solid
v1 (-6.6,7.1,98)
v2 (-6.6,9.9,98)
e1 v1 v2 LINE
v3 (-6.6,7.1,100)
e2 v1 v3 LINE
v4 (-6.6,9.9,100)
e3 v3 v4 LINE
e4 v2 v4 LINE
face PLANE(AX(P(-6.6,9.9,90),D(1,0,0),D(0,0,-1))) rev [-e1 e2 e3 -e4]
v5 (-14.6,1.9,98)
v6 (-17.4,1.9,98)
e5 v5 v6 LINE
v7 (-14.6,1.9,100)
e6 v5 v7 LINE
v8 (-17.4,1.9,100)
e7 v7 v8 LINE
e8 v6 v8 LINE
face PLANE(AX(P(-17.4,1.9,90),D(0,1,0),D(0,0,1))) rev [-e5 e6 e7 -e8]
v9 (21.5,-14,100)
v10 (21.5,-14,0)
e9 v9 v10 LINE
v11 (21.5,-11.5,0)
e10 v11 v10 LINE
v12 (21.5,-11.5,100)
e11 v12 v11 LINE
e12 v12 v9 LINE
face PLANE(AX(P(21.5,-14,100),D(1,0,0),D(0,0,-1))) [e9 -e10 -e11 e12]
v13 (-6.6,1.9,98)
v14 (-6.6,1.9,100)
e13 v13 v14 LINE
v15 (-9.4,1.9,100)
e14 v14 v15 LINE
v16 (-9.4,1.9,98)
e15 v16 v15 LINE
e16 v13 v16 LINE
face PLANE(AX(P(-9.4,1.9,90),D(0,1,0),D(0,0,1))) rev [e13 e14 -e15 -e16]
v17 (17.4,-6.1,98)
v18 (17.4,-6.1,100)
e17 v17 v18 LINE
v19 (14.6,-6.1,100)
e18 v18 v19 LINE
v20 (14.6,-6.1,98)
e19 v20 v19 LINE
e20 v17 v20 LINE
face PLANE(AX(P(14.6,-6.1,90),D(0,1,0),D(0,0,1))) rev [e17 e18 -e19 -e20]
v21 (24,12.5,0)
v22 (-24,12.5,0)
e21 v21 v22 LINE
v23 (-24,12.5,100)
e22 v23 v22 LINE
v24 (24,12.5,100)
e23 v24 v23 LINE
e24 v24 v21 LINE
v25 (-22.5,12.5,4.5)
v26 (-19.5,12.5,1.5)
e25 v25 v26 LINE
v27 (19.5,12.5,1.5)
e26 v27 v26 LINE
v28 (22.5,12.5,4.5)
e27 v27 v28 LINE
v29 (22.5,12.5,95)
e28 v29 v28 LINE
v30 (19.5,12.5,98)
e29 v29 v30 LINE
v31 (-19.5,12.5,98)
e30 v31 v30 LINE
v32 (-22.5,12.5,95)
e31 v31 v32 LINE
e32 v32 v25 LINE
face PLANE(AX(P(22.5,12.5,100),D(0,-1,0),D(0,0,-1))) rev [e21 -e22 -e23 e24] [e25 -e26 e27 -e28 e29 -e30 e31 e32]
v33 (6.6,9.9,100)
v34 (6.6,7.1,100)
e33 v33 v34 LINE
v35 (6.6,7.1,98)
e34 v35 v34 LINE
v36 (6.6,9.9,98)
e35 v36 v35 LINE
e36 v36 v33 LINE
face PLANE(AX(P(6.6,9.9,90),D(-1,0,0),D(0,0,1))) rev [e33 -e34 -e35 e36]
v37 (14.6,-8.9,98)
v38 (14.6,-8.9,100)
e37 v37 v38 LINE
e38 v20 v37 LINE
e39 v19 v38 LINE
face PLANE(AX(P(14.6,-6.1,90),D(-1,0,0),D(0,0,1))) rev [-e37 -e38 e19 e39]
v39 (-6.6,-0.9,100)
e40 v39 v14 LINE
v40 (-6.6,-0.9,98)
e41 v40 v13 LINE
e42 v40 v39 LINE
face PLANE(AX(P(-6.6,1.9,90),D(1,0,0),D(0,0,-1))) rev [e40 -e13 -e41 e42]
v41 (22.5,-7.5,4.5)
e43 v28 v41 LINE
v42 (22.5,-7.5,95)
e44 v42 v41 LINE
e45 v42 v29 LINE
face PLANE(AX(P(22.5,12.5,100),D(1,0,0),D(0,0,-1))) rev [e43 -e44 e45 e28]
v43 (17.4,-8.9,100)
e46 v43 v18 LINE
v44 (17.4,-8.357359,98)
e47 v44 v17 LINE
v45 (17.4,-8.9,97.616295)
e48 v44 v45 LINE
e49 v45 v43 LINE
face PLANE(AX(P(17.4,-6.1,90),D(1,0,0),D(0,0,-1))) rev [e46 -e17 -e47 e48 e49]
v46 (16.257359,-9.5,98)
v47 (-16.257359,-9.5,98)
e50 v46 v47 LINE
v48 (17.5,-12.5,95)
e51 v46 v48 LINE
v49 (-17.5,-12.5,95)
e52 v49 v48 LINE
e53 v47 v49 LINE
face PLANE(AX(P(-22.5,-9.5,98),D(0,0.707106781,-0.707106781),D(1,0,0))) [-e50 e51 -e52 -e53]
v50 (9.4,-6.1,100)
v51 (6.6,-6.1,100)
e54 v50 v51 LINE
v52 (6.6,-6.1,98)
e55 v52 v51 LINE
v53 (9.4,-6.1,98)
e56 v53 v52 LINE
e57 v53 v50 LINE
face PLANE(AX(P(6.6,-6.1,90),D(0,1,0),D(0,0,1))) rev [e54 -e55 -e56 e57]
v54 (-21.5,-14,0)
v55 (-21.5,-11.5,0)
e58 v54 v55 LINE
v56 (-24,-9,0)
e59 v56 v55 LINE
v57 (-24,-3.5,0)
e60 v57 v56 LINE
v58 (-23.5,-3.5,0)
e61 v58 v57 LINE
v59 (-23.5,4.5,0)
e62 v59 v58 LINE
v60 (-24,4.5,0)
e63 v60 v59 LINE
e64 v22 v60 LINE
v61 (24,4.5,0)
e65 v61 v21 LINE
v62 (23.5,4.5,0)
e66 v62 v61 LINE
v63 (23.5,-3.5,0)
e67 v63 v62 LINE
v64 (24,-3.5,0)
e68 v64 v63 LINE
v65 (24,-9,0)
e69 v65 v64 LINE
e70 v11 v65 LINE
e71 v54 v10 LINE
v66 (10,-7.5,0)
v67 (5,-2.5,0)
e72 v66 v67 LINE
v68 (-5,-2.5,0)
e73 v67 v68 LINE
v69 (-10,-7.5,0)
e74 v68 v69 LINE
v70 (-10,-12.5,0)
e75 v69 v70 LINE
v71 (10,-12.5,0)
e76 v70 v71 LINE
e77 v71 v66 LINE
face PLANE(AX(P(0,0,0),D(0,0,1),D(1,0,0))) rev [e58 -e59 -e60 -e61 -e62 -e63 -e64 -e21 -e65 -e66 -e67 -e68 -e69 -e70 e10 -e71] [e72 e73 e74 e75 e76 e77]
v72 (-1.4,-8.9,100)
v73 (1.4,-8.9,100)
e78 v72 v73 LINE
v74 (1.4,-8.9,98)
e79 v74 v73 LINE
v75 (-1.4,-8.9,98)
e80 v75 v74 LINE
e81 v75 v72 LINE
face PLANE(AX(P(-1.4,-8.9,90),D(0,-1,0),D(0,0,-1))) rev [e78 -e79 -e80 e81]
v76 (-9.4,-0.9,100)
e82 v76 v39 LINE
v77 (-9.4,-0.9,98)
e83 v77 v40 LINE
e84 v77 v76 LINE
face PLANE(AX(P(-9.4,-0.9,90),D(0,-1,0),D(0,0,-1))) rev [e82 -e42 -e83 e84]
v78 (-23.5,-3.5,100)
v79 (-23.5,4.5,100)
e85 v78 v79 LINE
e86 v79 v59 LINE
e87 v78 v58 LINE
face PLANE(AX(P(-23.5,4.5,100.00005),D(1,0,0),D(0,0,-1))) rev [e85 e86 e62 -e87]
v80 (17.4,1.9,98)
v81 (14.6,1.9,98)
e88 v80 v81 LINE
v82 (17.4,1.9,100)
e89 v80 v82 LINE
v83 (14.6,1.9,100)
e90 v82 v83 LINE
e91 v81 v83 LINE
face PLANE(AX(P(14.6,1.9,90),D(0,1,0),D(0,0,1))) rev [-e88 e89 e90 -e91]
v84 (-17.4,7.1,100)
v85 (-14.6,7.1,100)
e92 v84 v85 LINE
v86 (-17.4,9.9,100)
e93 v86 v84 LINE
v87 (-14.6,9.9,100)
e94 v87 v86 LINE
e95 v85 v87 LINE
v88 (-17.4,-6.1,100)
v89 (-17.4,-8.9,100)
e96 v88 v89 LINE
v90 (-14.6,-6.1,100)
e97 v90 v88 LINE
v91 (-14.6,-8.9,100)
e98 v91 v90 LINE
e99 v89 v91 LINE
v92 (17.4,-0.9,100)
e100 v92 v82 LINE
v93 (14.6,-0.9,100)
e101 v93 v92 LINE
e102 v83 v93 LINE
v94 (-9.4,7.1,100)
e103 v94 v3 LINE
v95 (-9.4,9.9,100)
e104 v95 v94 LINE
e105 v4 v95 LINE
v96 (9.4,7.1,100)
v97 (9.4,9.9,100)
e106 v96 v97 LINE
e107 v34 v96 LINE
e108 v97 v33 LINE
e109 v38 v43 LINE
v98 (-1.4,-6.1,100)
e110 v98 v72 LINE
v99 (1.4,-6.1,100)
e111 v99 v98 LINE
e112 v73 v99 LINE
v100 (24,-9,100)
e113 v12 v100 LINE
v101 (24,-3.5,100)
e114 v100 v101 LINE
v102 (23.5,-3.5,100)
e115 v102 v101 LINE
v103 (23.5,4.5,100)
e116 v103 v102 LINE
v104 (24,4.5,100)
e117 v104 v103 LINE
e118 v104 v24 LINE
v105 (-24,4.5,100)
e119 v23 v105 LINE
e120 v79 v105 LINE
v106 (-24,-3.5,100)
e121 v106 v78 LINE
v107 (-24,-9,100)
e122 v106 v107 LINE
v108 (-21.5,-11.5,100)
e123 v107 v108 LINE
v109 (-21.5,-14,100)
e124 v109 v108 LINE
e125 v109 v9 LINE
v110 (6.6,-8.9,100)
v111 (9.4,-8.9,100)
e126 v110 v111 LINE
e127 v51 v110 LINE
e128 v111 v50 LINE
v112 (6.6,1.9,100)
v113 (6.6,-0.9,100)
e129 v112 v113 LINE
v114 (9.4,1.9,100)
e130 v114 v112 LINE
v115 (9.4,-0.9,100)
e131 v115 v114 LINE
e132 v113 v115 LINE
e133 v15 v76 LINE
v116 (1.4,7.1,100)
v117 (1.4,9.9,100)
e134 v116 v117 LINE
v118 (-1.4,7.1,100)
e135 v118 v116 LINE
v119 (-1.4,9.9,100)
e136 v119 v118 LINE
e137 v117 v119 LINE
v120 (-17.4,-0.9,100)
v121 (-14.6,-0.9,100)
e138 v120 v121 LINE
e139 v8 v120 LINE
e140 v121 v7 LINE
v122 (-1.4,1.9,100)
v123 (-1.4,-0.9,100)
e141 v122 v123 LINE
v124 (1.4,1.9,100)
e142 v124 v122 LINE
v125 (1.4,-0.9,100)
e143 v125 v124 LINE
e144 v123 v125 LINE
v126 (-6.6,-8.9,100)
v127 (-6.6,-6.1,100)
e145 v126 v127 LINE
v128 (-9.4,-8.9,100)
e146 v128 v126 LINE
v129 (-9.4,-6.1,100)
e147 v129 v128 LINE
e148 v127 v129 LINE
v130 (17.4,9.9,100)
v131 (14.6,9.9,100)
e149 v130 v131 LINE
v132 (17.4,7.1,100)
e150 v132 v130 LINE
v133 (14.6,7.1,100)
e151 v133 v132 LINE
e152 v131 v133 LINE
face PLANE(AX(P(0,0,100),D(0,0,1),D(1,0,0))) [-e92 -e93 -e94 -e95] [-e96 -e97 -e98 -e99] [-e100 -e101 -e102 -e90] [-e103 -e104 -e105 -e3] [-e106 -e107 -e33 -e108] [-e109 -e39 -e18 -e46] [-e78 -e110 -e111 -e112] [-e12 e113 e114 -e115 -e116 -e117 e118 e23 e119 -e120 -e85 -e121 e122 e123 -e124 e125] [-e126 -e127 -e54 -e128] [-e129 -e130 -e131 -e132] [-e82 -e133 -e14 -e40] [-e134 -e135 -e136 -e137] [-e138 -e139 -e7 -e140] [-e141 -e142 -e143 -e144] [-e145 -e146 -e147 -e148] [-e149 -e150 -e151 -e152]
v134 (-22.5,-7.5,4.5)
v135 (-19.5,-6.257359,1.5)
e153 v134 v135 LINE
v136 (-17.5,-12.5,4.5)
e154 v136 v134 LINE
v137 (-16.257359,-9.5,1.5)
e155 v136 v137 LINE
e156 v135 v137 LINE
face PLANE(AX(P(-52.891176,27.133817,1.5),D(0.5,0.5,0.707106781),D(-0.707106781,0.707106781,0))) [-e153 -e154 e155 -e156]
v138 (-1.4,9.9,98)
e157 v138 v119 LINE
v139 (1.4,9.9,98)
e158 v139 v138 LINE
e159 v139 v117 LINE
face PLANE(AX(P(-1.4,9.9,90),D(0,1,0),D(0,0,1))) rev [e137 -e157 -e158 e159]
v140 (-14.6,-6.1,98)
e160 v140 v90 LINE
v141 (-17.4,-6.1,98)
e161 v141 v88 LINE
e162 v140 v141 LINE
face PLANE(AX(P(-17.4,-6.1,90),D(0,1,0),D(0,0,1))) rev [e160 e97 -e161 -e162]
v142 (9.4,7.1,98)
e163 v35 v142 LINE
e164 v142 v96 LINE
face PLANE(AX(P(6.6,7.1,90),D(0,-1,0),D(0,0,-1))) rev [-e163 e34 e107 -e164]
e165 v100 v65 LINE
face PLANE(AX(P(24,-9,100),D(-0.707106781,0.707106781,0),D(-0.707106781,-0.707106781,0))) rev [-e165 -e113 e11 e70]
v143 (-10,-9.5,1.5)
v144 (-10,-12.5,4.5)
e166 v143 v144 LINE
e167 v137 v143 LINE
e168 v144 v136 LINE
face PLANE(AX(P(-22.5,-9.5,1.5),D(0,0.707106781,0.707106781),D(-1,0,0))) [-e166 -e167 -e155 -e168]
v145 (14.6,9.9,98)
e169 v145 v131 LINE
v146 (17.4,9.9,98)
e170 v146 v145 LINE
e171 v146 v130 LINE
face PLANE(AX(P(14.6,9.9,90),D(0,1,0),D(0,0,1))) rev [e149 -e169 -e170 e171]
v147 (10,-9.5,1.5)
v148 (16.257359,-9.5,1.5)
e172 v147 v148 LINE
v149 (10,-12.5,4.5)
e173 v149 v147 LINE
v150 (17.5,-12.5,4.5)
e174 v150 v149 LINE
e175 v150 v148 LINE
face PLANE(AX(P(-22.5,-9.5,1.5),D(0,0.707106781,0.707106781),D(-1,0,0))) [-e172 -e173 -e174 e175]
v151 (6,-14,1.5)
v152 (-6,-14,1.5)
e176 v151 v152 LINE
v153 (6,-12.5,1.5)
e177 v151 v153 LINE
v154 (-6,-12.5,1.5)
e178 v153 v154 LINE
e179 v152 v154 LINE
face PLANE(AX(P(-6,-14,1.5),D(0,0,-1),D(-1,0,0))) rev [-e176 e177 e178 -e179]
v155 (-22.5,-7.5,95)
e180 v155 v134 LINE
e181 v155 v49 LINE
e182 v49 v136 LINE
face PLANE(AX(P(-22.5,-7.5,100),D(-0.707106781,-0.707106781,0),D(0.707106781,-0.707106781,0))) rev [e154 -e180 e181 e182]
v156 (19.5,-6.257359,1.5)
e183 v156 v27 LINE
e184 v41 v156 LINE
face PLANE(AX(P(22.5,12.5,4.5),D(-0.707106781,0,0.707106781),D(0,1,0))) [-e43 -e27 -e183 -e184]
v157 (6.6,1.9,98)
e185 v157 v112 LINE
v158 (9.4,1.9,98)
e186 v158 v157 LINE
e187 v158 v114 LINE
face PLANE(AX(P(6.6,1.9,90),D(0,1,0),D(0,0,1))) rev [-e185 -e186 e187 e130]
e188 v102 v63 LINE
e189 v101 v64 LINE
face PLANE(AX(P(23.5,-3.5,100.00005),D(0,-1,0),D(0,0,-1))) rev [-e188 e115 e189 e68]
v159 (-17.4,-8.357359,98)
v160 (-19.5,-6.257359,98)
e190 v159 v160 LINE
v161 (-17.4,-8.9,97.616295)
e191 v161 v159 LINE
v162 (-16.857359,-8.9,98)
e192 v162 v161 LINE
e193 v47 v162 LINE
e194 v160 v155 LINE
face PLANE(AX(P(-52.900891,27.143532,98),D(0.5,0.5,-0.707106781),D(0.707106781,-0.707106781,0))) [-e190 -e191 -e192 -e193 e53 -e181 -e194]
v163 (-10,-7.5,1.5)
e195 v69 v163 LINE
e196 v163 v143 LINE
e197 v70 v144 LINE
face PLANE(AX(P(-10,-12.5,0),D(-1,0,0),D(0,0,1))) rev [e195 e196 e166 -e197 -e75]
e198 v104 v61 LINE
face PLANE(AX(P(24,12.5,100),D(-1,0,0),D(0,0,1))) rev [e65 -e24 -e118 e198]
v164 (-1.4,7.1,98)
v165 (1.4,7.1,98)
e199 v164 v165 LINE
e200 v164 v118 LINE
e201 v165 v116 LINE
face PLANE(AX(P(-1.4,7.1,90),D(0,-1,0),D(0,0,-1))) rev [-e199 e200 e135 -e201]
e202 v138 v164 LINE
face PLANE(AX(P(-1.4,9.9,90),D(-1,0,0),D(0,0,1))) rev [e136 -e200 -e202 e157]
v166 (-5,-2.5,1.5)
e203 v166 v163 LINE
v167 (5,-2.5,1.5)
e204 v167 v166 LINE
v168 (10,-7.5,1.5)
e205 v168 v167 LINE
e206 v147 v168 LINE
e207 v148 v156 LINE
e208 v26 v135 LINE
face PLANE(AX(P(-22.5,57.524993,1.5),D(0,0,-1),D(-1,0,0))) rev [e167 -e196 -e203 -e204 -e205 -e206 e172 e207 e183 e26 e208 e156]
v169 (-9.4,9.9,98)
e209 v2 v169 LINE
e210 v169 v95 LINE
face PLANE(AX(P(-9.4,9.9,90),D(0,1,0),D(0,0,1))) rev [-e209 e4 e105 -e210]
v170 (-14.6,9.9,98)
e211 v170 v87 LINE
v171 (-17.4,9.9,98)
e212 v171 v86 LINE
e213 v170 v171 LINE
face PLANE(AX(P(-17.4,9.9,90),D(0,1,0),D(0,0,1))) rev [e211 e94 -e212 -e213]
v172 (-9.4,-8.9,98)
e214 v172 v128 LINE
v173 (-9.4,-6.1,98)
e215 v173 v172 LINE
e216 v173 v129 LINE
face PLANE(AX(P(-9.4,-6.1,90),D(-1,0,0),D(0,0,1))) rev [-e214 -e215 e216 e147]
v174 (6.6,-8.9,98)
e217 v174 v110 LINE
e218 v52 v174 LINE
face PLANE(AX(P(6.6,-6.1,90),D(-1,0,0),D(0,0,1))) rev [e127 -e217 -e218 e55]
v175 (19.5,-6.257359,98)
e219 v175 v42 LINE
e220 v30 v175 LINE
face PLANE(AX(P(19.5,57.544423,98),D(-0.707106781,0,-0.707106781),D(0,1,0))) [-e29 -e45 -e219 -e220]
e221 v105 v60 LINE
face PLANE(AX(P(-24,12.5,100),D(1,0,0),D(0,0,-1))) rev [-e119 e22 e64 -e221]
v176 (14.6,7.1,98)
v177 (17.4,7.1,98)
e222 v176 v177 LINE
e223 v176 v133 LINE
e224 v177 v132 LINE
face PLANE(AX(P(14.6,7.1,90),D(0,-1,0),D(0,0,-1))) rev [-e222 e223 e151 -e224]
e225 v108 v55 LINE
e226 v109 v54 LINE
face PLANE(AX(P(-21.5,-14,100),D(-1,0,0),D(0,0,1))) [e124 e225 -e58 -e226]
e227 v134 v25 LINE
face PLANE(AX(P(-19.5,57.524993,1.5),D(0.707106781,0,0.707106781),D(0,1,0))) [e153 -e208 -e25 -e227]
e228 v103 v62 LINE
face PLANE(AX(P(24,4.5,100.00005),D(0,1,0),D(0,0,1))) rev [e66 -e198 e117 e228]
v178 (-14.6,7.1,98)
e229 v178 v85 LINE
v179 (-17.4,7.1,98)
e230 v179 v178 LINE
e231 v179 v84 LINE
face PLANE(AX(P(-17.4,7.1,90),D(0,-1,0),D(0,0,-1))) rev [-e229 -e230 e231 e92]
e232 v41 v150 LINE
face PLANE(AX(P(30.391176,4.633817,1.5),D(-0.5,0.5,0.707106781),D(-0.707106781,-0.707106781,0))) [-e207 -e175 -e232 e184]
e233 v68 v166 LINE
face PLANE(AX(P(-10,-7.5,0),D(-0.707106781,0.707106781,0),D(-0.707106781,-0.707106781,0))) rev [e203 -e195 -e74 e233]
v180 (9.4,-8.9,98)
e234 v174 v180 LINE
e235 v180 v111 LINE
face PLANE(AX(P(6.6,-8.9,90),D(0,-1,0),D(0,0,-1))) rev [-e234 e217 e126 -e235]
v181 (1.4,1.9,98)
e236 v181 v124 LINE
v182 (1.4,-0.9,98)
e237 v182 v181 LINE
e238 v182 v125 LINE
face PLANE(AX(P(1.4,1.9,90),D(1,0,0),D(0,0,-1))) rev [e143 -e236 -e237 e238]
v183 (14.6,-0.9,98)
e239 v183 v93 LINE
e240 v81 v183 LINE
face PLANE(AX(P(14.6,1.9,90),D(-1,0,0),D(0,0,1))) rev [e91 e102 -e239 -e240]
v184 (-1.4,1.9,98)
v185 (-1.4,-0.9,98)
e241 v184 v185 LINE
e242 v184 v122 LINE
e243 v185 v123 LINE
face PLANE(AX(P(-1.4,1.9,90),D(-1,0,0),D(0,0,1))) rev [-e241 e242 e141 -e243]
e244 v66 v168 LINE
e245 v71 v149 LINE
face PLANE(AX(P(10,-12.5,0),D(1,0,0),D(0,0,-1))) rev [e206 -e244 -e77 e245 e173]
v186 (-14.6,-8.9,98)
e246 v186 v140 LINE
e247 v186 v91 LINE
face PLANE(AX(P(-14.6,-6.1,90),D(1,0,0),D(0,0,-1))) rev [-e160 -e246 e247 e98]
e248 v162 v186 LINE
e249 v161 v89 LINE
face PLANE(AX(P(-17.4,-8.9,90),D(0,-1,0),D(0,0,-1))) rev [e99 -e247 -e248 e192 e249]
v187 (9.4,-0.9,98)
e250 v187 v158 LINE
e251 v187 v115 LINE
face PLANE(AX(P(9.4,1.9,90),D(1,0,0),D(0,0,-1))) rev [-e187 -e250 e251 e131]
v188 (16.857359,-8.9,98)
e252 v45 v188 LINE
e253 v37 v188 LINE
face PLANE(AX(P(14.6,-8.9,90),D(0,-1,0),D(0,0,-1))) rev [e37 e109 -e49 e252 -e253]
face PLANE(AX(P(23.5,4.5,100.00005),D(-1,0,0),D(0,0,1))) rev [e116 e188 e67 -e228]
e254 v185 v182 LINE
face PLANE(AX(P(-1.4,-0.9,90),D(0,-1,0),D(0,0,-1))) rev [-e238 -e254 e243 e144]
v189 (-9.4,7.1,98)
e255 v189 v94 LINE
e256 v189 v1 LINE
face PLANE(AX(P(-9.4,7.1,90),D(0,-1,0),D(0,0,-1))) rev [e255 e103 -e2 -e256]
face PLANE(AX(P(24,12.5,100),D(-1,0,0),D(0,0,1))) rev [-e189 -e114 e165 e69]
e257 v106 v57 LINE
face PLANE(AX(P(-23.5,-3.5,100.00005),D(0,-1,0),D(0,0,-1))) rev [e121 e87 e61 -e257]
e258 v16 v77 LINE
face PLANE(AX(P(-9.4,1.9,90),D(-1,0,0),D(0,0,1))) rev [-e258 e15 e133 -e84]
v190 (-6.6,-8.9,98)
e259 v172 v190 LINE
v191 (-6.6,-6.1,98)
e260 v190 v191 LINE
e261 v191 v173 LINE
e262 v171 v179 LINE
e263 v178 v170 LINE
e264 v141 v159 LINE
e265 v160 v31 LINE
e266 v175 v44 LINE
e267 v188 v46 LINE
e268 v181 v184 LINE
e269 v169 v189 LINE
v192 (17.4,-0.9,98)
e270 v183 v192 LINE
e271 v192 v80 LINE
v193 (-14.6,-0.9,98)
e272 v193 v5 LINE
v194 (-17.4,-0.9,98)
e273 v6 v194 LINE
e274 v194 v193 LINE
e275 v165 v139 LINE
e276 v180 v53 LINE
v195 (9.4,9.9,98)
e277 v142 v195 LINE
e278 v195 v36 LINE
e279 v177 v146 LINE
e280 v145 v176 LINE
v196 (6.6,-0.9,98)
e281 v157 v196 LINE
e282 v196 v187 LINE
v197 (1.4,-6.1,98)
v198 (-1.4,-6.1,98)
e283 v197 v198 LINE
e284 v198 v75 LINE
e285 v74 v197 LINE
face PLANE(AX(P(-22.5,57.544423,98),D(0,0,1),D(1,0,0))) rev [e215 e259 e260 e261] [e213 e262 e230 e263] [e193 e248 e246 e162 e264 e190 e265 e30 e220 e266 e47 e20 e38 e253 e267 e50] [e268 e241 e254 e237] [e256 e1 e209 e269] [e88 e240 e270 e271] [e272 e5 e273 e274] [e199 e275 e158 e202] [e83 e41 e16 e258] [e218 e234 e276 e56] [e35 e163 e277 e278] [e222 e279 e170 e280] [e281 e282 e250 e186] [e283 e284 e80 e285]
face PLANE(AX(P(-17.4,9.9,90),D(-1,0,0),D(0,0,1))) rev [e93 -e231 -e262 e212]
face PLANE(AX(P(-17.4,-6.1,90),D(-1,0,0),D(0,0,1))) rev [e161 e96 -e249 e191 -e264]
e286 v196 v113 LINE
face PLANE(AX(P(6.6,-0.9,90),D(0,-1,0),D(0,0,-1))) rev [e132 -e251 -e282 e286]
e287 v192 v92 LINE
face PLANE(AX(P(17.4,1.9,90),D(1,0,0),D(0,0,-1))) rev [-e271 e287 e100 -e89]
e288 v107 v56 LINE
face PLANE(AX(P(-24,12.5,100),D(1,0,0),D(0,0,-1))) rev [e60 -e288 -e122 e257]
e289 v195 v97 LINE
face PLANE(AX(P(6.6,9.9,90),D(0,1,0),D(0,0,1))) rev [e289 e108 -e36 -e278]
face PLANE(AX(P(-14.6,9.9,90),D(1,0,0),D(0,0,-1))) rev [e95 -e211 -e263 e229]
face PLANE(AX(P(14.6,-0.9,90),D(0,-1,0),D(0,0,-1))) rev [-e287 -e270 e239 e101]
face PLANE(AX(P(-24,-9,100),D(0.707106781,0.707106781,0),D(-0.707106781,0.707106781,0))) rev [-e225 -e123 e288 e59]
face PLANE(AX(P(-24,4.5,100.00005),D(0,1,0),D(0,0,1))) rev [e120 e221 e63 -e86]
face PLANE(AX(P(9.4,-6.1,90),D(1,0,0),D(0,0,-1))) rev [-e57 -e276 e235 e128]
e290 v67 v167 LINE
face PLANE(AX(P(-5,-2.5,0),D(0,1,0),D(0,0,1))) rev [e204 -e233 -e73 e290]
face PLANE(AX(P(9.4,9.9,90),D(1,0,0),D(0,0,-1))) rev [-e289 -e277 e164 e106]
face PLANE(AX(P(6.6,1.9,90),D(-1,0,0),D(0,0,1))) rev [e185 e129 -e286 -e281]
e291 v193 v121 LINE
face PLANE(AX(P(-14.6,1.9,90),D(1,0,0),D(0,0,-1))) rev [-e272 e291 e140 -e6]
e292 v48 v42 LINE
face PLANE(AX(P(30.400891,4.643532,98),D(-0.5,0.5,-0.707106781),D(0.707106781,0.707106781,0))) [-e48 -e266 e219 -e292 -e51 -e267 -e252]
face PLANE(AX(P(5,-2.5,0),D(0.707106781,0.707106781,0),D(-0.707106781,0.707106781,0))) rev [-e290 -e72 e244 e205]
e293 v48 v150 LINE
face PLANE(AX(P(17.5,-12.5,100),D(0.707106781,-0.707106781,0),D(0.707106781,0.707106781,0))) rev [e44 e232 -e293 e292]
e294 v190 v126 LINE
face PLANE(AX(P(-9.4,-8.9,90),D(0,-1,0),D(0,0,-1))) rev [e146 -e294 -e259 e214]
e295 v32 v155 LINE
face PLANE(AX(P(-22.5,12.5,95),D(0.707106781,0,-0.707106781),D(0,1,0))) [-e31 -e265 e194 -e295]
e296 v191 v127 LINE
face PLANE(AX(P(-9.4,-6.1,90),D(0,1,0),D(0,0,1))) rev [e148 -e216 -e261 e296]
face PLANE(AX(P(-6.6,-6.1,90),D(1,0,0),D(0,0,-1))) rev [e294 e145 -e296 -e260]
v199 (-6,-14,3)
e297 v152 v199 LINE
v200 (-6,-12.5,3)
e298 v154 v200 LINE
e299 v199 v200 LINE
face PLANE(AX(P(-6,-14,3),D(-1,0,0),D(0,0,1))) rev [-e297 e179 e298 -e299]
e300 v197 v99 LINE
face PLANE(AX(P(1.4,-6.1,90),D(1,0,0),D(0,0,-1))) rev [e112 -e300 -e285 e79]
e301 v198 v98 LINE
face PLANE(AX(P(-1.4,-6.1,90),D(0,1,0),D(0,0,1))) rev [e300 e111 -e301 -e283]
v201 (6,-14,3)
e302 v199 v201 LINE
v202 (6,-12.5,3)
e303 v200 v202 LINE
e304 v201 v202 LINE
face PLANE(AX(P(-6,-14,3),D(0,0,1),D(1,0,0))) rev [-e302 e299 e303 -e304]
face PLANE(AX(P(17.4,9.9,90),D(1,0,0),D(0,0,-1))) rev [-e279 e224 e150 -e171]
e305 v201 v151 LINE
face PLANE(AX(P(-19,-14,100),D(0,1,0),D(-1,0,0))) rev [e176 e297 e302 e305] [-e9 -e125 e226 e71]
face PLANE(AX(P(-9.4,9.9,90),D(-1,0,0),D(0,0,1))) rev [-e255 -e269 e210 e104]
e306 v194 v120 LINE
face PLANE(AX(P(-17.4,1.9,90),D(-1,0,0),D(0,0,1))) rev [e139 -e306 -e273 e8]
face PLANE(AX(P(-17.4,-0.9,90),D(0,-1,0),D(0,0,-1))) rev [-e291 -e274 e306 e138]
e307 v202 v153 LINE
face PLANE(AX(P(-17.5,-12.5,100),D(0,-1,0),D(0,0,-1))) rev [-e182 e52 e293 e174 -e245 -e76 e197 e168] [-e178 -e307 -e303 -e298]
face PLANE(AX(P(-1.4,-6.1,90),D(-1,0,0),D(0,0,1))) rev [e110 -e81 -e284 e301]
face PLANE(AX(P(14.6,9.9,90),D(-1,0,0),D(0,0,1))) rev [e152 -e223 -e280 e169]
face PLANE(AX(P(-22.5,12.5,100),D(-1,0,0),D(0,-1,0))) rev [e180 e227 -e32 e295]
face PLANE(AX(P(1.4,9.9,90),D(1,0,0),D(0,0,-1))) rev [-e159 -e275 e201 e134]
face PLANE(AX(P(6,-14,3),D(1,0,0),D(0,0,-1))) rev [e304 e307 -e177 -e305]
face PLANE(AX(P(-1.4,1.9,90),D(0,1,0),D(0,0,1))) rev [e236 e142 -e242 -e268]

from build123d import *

# Parameters (mm, degrees)
RESSALTO_EXTRUS_O1_DEPTH = 100
RESSALTO_EXTRUS_O3_REACH = 107.835
ESBO_O3_W                = 45
ESBO_O3_H                = 1.5
CORTE_EXTRUS_O1_DEPTH    = 103.343783397
ESBO_O5_W                = 12
ESBO_O5_H                = 1.5
CORTE_EXTRUS_O2_DEPTH    = 106.834776893
ESBO_O6_W                = 45
ESBO_O6_H                = 2
RESSALTO_EXTRUS_O4_DEPTH = 25
ESBO_O7_W                = 2.8
ESBO_O7_H                = 2.8
CORTE_EXTRUS_O3_DEPTH    = 10
CORTE_EXTRUS_O4_DEPTH    = 104.788245963
RESSALTO_EXTRUS_O5_DEPTH = 100
ESBO_O10_W               = 0.5
ESBO_O10_H               = 8
CORTE_EXTRUS_O5_DEPTH    = 104.788245963
CHANFRO1_SIZE            = 3
CHANFRO2_SIZE            = 3


with BuildPart() as part:
    # Esboço1 → Ressalto-extrusão1 (new body)
    with BuildSketch(Plane.XY):
        Polygon((-22.5, 12.5), (-22.5, -7.5), (-17.5, -12.5), (17.5, -12.5), (22.5, -7.5), (22.5, 12.5), (24, 12.5), (24, -9), (19, -14), (-19, -14), (-24, -9), (-24, 12.5), align=None)
    extrude(amount=RESSALTO_EXTRUS_O1_DEPTH)

    # Ressalto-extrusão3: up to this face of the body (flat: up to its plane)
    ressalto_extrus_o3_end = Plane(part.part.faces().sort_by_distance((-23.25, 12.5, 50))[0])
    # Esboço3 → Ressalto-extrusão3 (add, up to the picked face)
    with BuildSketch(Plane(origin=(0, -12.5, 0), x_dir=(1, 0, 0), z_dir=(0, 1, 0)), mode=Mode.PRIVATE) as ressalto_extrus_o3_sk1:
        with Locations((0, -0.75)):
            Rectangle(ESBO_O3_W, ESBO_O3_H)
    ressalto_extrus_o3_tool1 = split(extrude(ressalto_extrus_o3_sk1.sketch, amount=RESSALTO_EXTRUS_O3_REACH, mode=Mode.PRIVATE), bisect_by=ressalto_extrus_o3_end, keep=Keep.BOTH, mode=Mode.PRIVATE)
    add(ressalto_extrus_o3_tool1.solids().sort_by(Axis((0, -12.5, 0.75), (0, 1, 0)))[0])

    # Esboço4 → Corte-extrusão1 (cut, through all)
    with BuildSketch(Plane.XY.offset(1.5)):
        Polygon((-10, -12.5), (10, -12.5), (10, -7.5), (5, -2.5), (-5, -2.5), (-10, -7.5), align=None)
    extrude(amount=-CORTE_EXTRUS_O1_DEPTH, mode=Mode.SUBTRACT)

    # Esboço5 → Corte-extrusão2 (cut, through all)
    with BuildSketch(Plane(origin=(0, -12.5, 0), x_dir=(1, 0, 0), z_dir=(0, 1, 0))):
        with Locations((0, -2.25)):
            Rectangle(ESBO_O5_W, ESBO_O5_H)
    extrude(amount=-CORTE_EXTRUS_O2_DEPTH, mode=Mode.SUBTRACT)

    # Esboço6 → Ressalto-extrusão4 (add)
    with BuildSketch(Plane(origin=(0, -12.5, 0), x_dir=(1, 0, 0), z_dir=(0, 1, 0))):
        with Locations((0, -99)):
            Rectangle(ESBO_O6_W, ESBO_O6_H)
    extrude(amount=RESSALTO_EXTRUS_O4_DEPTH)

    # Esboço7 → Corte-extrusão3 (cut)
    with BuildSketch(Plane.XY.offset(100)):
        with Locations((-8, 8.5)):
            Rectangle(ESBO_O7_W, ESBO_O7_H)
        with Locations((-16, 8.5)):
            Rectangle(ESBO_O7_W, ESBO_O7_H)
        with Locations((0, 8.5)):
            Rectangle(ESBO_O7_W, ESBO_O7_H)
        with Locations((8, 8.5)):
            Rectangle(ESBO_O7_W, ESBO_O7_H)
        with Locations((16, 8.5)):
            Rectangle(ESBO_O7_W, ESBO_O7_H)
        with Locations((-8, 0.5)):
            Rectangle(ESBO_O7_W, ESBO_O7_H)
        with Locations((0, 0.5)):
            Rectangle(ESBO_O7_W, ESBO_O7_H)
        with Locations((8, 0.5)):
            Rectangle(ESBO_O7_W, ESBO_O7_H)
        with Locations((16, 0.5)):
            Rectangle(ESBO_O7_W, ESBO_O7_H)
        with Locations((-8, -7.5)):
            Rectangle(ESBO_O7_W, ESBO_O7_H)
        with Locations((0, -7.5)):
            Rectangle(ESBO_O7_W, ESBO_O7_H)
        with Locations((8, -7.5)):
            Rectangle(ESBO_O7_W, ESBO_O7_H)
        with Locations((16, -7.5)):
            Rectangle(ESBO_O7_W, ESBO_O7_H)
        with Locations((-16, 0.5)):
            Rectangle(ESBO_O7_W, ESBO_O7_H)
        with Locations((-16, -7.5)):
            Rectangle(ESBO_O7_W, ESBO_O7_H)
    extrude(amount=-CORTE_EXTRUS_O3_DEPTH, mode=Mode.SUBTRACT)

    # Esboço8 → Corte-extrusão4 (cut, through all)
    with BuildSketch(Plane(origin=(0, 0, 0), x_dir=(-1, 0, 0), z_dir=(0, 0, -1))):
        Polygon((-22.5, -10.5), (-22.5, -12.5), (-20.5, -12.5), align=None)
        Polygon((20.5, -12.5), (22.5, -12.5), (22.5, -10.5), align=None)
    extrude(amount=-CORTE_EXTRUS_O4_DEPTH, mode=Mode.SUBTRACT)

    # Esboço9 → Ressalto-extrusão5 (add, through all)
    with BuildSketch(Plane(origin=(0, 0, 0), x_dir=(-1, 0, 0), z_dir=(0, 0, -1))):
        Polygon((-19, -14), (-21.5, -14), (-21.5, -11.5), align=None)
        Polygon((19, -14), (21.5, -14), (21.5, -11.5), align=None)
    extrude(amount=-RESSALTO_EXTRUS_O5_DEPTH)

    # Esboço10 → Corte-extrusão5 (cut, through all)
    with BuildSketch(Plane(origin=(0, 0, 0), x_dir=(-1, 0, 0), z_dir=(0, 0, -1))):
        with Locations((-23.75, 0.5)):
            Rectangle(ESBO_O10_W, ESBO_O10_H)
        with Locations((23.75, 0.5)):
            Rectangle(ESBO_O10_W, ESBO_O10_H)
    extrude(amount=-CORTE_EXTRUS_O5_DEPTH, mode=Mode.SUBTRACT)

    # Chanfro1
    # the kernel refuses this chamfer: 3 mm, written as the material it adds along each edge
    with BuildSketch(Plane(origin=(22.5, -15.215048964, 98), x_dir=(0.027495876610586768, 0, -0.9996219169112968), z_dir=(0, 1, 0))) as chanfro1_piece_1_section:
        Polygon((CHANFRO1_SIZE * 0.999621916911, CHANFRO1_SIZE * 0.0274958766106), (-CHANFRO1_SIZE * 0.0274958766106, CHANFRO1_SIZE * 0.999621916911), (0, 0), align=None)
    chanfro1_piece_1 = extrude(amount=27.715048964, mode=Mode.PRIVATE)
    chanfro1_piece_1 = split(chanfro1_piece_1, bisect_by=Plane(origin=(27.146986971, -2.853013029, 96.73534202), z_dir=(-0.7071067811865475, 0.7071067811865476, 0)), keep=Keep.TOP, mode=Mode.PRIVATE)
    add(chanfro1_piece_1)
    with BuildSketch(Plane(origin=(12.04463656, -17.95536344, 98), x_dir=(-0.7068394360706735, 0.7068394360706735, 0.027495876610586778), z_dir=(0.7071067811865476, 0.7071067811865475, 0))) as chanfro1_piece_2_section:
        Polygon((CHANFRO1_SIZE * 0.999621916911, -CHANFRO1_SIZE * 0.0274958766106), (-CHANFRO1_SIZE * 0.0274958766106, -CHANFRO1_SIZE * 0.999621916911), (0, 0), align=None)
    chanfro1_piece_2 = extrude(amount=22.50116574, mode=Mode.PRIVATE)
    chanfro1_piece_2 = split(chanfro1_piece_2, bisect_by=Plane(origin=(16.362312496, -12.5, 97.266244129), z_dir=(0, 1, 0)), keep=Keep.TOP, mode=Mode.PRIVATE)
    chanfro1_piece_2 = split(chanfro1_piece_2, bisect_by=Plane(origin=(16.362312496, -8.9, 97.266244129), z_dir=(0, -1, 0)), keep=Keep.TOP, mode=Mode.PRIVATE)
    add(chanfro1_piece_2)
    with BuildSketch(Plane(origin=(12.04463656, -17.95536344, 98), x_dir=(-0.7068394360706735, 0.7068394360706735, 0.027495876610586778), z_dir=(0.7071067811865476, 0.7071067811865475, 0))) as chanfro1_piece_3_section:
        Polygon((CHANFRO1_SIZE * 0.999621916911, -CHANFRO1_SIZE * 0.0274958766106), (-CHANFRO1_SIZE * 0.0274958766106, -CHANFRO1_SIZE * 0.999621916911), (0, 0), align=None)
    chanfro1_piece_3 = extrude(amount=22.50116574, mode=Mode.PRIVATE)
    chanfro1_piece_3 = split(chanfro1_piece_3, bisect_by=Plane(origin=(22.5, -7.314063038, 97.124733651), z_dir=(-1, 0, 0)), keep=Keep.TOP, mode=Mode.PRIVATE)
    chanfro1_piece_3 = split(chanfro1_piece_3, bisect_by=Plane(origin=(17.4, -7.314063038, 97.124733651), z_dir=(1, 0, 0)), keep=Keep.TOP, mode=Mode.PRIVATE)
    add(chanfro1_piece_3)
    with BuildSketch(Plane(origin=(25.215048964, -12.5, 98), x_dir=(0, -0.02749587661058619, -0.9996219169112968), z_dir=(-1, 0, 0))) as chanfro1_piece_4_section:
        Polygon((CHANFRO1_SIZE * 0.999621916911, -CHANFRO1_SIZE * 0.0274958766106), (-CHANFRO1_SIZE * 0.0274958766106, -CHANFRO1_SIZE * 0.999621916911), (0, 0), align=None)
    chanfro1_piece_4 = extrude(amount=50.430097928, mode=Mode.PRIVATE)
    chanfro1_piece_4 = split(chanfro1_piece_4, bisect_by=Plane(origin=(-9.263513514, -20.736486486, 97.013513514), z_dir=(0.7071067811865475, 0.7071067811865476, 0)), keep=Keep.TOP, mode=Mode.PRIVATE)
    chanfro1_piece_4 = split(chanfro1_piece_4, bisect_by=Plane(origin=(9.263513514, -20.736486486, 97.013513514), z_dir=(-0.7071067811865475, 0.7071067811865476, 0)), keep=Keep.TOP, mode=Mode.PRIVATE)
    add(chanfro1_piece_4)
    with BuildSketch(Plane(origin=(-27.95536344, -2.04463656, 98), x_dir=(0.7068394360706733, 0.7068394360706736, 0.027495876610586757), z_dir=(0.7071067811865476, -0.7071067811865475, 0))) as chanfro1_piece_5_section:
        Polygon((CHANFRO1_SIZE * 0.999621916911, -CHANFRO1_SIZE * 0.0274958766106), (-CHANFRO1_SIZE * 0.0274958766106, -CHANFRO1_SIZE * 0.999621916911), (0, 0), align=None)
    chanfro1_piece_5 = extrude(amount=22.50116574, mode=Mode.PRIVATE)
    chanfro1_piece_5 = split(chanfro1_piece_5, bisect_by=Plane(origin=(-22.5, -3.439339828, 97.957106781), z_dir=(1, 0, 0)), keep=Keep.TOP, mode=Mode.PRIVATE)
    chanfro1_piece_5 = split(chanfro1_piece_5, bisect_by=Plane(origin=(-17.4, -3.439339828, 97.957106781), z_dir=(-1, 0, 0)), keep=Keep.TOP, mode=Mode.PRIVATE)
    add(chanfro1_piece_5)
    with BuildSketch(Plane(origin=(-27.95536344, -2.04463656, 98), x_dir=(0.7068394360706733, 0.7068394360706736, 0.027495876610586757), z_dir=(0.7071067811865476, -0.7071067811865475, 0))) as chanfro1_piece_6_section:
        Polygon((CHANFRO1_SIZE * 0.999621916911, -CHANFRO1_SIZE * 0.0274958766106), (-CHANFRO1_SIZE * 0.0274958766106, -CHANFRO1_SIZE * 0.999621916911), (0, 0), align=None)
    chanfro1_piece_6 = extrude(amount=22.50116574, mode=Mode.PRIVATE)
    chanfro1_piece_6 = split(chanfro1_piece_6, bisect_by=Plane(origin=(-16.362312496, -12.5, 97.266244129), z_dir=(0, 1, 0)), keep=Keep.TOP, mode=Mode.PRIVATE)
    chanfro1_piece_6 = split(chanfro1_piece_6, bisect_by=Plane(origin=(-16.362312496, -8.9, 97.266244129), z_dir=(0, -1, 0)), keep=Keep.TOP, mode=Mode.PRIVATE)
    add(chanfro1_piece_6)
    with BuildSketch(Plane(origin=(-22.5, -15.215048964, 98), x_dir=(-0.027495876610586768, 0, -0.9996219169112968), z_dir=(0, 1, 0))) as chanfro1_piece_7_section:
        Polygon((CHANFRO1_SIZE * 0.999621916911, -CHANFRO1_SIZE * 0.0274958766106), (-CHANFRO1_SIZE * 0.0274958766106, -CHANFRO1_SIZE * 0.999621916911), (0, 0), align=None)
    chanfro1_piece_7 = extrude(amount=27.715048964, mode=Mode.PRIVATE)
    chanfro1_piece_7 = split(chanfro1_piece_7, bisect_by=Plane(origin=(-27.146986971, -2.853013029, 96.73534202), z_dir=(0.7071067811865475, 0.7071067811865476, 0)), keep=Keep.TOP, mode=Mode.PRIVATE)
    add(chanfro1_piece_7)

    # Chanfro2
    chanfro2_edges = [part.edges().sort_by_distance(p)[0] for p in [
        (-13.75, -12.5, 1.5),
        (20, -10, 1.5),
        (-22.5, 2.5, 1.5),
        (-20, -10, 1.5),
        (22.5, 2.5, 1.5),
        (13.75, -12.5, 1.5),
    ]]
    chamfer(chanfro2_edges, length=CHANFRO2_SIZE)


solid = part.part
